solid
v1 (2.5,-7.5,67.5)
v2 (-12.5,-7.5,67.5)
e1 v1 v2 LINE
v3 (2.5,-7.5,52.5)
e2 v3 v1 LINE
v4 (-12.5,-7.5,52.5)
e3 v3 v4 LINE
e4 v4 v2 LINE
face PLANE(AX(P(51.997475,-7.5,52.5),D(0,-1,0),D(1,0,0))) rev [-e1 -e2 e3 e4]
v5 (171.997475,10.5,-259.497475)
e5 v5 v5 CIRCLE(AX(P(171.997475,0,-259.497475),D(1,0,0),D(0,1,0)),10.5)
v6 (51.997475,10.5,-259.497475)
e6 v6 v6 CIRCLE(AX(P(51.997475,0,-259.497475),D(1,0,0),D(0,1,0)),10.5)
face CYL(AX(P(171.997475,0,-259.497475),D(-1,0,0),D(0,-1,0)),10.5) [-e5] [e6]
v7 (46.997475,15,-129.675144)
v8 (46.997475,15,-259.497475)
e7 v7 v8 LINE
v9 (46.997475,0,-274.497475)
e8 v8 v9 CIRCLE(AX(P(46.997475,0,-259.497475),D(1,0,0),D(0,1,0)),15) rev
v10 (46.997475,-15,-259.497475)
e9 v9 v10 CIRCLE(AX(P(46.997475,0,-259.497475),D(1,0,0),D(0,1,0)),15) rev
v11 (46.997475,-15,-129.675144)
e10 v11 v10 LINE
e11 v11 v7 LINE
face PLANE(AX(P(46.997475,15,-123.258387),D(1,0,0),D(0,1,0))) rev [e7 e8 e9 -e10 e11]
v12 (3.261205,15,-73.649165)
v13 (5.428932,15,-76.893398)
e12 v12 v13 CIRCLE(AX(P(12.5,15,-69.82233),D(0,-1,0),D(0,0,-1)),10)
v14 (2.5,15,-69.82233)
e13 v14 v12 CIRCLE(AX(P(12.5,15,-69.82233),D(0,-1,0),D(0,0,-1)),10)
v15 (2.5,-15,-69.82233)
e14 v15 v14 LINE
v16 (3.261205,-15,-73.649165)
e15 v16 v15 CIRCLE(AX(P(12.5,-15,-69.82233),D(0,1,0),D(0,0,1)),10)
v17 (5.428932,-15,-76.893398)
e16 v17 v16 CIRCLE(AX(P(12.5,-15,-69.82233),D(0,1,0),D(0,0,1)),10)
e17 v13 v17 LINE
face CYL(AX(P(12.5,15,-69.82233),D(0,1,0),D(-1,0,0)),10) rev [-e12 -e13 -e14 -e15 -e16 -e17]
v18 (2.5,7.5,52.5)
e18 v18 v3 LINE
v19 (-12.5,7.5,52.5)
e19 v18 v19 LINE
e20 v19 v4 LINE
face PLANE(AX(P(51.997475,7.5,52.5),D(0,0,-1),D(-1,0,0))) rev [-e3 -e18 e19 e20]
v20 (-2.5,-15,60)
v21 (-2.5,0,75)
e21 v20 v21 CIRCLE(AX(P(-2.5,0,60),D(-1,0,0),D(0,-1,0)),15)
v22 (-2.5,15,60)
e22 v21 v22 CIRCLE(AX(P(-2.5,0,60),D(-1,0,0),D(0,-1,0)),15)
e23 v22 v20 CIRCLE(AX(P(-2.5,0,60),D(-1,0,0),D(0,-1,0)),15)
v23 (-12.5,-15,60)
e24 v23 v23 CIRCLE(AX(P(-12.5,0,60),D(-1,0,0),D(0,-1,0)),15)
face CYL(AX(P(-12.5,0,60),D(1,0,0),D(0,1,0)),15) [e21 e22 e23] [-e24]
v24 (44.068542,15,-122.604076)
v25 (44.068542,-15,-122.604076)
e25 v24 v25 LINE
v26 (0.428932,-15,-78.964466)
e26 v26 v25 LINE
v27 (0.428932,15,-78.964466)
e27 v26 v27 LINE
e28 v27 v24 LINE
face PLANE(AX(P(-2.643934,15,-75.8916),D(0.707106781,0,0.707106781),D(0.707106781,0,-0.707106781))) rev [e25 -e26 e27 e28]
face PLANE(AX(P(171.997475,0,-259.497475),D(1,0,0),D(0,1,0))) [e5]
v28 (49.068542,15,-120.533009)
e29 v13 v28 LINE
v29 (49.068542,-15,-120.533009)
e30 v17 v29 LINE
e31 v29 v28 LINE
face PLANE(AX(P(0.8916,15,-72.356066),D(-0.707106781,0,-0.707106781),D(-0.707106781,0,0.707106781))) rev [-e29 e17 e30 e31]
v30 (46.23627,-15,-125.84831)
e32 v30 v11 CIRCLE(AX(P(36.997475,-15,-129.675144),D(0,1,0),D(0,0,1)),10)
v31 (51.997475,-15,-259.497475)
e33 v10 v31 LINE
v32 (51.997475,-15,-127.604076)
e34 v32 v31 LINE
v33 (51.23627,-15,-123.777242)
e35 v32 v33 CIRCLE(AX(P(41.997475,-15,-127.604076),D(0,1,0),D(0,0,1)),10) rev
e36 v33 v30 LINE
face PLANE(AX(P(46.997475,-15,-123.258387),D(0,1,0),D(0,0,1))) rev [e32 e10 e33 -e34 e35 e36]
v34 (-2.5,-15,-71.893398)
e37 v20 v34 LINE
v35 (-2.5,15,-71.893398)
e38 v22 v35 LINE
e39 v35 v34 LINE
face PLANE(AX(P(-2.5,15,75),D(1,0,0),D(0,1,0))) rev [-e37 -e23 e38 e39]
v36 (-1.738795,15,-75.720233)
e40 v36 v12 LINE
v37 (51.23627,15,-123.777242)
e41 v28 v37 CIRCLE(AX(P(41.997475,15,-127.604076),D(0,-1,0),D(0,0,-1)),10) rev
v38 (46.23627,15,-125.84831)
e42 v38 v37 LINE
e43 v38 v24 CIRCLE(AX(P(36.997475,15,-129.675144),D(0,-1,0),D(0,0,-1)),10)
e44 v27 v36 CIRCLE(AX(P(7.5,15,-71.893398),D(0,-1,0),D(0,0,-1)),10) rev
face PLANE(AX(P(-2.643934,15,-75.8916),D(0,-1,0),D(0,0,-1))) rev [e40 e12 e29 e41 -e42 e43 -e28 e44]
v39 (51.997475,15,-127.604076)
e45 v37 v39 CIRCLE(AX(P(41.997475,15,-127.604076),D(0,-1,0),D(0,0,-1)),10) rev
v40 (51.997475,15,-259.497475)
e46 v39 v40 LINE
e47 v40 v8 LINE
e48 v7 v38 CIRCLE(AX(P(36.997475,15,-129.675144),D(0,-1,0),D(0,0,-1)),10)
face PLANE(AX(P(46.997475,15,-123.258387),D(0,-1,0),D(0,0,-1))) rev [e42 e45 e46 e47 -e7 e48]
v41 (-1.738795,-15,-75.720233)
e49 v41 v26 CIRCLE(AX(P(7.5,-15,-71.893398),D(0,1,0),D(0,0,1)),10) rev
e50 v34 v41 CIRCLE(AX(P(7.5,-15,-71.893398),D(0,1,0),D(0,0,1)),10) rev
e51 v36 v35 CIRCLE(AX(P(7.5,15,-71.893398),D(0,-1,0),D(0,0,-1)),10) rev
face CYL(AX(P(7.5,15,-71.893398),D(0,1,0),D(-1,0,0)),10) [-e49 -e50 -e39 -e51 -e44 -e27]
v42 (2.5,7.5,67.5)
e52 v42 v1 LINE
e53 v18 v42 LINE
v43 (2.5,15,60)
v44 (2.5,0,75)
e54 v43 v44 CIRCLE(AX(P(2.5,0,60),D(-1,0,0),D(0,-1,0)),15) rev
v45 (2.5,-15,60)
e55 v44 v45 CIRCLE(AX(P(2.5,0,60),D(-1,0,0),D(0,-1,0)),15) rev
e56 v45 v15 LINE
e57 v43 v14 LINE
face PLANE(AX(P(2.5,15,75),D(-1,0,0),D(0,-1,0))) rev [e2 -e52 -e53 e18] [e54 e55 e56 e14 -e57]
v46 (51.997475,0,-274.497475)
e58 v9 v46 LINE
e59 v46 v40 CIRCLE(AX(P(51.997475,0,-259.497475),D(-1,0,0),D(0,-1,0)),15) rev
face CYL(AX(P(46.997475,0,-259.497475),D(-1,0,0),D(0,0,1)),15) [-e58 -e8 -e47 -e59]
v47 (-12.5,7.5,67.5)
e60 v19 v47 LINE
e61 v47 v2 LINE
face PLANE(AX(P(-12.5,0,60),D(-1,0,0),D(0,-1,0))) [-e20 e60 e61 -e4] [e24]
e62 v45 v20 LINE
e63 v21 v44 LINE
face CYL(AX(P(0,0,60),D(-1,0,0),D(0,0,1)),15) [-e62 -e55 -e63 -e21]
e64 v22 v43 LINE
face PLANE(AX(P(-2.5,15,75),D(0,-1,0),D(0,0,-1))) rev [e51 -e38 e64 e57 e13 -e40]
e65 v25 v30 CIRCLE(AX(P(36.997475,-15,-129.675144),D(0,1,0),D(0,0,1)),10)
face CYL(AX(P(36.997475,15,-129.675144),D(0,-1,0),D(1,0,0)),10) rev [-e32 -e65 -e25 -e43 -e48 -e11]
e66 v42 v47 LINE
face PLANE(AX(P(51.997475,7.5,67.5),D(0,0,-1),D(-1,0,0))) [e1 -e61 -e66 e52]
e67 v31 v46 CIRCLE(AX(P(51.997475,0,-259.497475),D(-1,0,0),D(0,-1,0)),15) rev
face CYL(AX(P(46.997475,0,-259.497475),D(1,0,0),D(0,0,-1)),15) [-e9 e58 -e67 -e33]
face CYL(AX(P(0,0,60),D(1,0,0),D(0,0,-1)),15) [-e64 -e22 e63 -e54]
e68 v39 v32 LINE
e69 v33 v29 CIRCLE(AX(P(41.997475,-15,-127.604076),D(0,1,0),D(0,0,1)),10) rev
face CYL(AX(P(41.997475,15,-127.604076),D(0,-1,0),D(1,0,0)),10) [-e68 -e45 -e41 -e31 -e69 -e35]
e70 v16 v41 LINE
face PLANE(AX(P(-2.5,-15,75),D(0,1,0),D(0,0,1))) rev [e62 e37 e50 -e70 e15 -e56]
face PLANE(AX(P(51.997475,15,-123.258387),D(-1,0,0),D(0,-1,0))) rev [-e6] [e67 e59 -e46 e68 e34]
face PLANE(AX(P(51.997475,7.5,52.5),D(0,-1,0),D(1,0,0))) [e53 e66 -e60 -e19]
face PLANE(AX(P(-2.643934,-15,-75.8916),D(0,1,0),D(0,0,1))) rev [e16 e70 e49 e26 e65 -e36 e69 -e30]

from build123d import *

# Parameters (mm, degrees)
SKETCH6_W               = 5
SKETCH6_H               = 30
SKETCH7_R               = 15
BOSS_EXTRUDE1_DEPTH     = 10
CUT_EXTRUDE1_DEPTH      = 281.256736501
CUT_EXTRUDE1_DEPTH_BACK = 281.256736501
SKETCH7_3_W             = 15
SKETCH7_3_H             = 15
FILLET1_R               = 10
FILLET2_R               = 15
SKETCH9_R               = 10.5
BOSS_EXTRUDE2_DEPTH     = 120


with BuildPart() as part:
    # Sweep1: sweep along a path in Sketch2
    with BuildLine(Plane(origin=(0, 0, 0), x_dir=(1, 0, 0), z_dir=(0, 1, 0))) as sweep1_path:
        Line((0, -75), (0, 75))
        Line((0, 75), (49.497474683, 124.497474683))
        Line((49.497474683, 124.497474683), (49.497474683, 274.497474683))
    # Sketch6 → Sweep1 (sweep)
    with BuildSketch(Plane.XY.offset(75)):
        Rectangle(SKETCH6_W, SKETCH6_H)
    sweep(path=sweep1_path.line, transition=Transition.RIGHT)

    # Sketch7 → Boss-Extrude1 (add)
    with BuildSketch(Plane.ZY.offset(2.5)):
        with Locations(Location((60, 0, 0), (0, 0, 270))):
            Circle(SKETCH7_R)
    extrude(amount=BOSS_EXTRUDE1_DEPTH)

    # Sketch7<3> → Cut-Extrude1 (cut, two sides: drawn at the far end of the back side and taken through both)
    with BuildSketch(Plane.ZY.offset(2.5).offset(-CUT_EXTRUDE1_DEPTH_BACK)):
        with Locations((60, 0)):
            Rectangle(SKETCH7_3_W, SKETCH7_3_H)
    extrude(amount=CUT_EXTRUDE1_DEPTH + CUT_EXTRUDE1_DEPTH_BACK, mode=Mode.SUBTRACT)

    # Fillet1
    fillet1_edges = [part.edges().sort_by_distance(p)[0] for p in [
        (-2.5, 0, -76.035533906),
        (2.5, 0, -73.964466094),
        (51.997474683, 0, -123.461940777),
        (46.997474683, 0, -125.533008589),
    ]]
    fillet(fillet1_edges, radius=FILLET1_R)

    # Fillet2
    fillet2_edges = [part.edges().sort_by_distance(p)[0] for p in [
        (0, 15, 75),
        (0, -15, 75),
        (49.497474683, -15, -274.497474683),
        (49.497474683, 15, -274.497474683),
    ]]
    fillet(fillet2_edges, radius=FILLET2_R - 0.0001)  # a hair under: the kernel refuses the full size

    # Sketch9 → Boss-Extrude2 (add)
    with BuildSketch(Plane(origin=(51.997474683, 0, 0), x_dir=(0, 0, -1), z_dir=(1, 0, 0))):
        with Locations(Location((259.497474683, 0, 0), (0, 0, 90))):
            Circle(SKETCH9_R)
    extrude(amount=BOSS_EXTRUDE2_DEPTH)


solid = part.part
